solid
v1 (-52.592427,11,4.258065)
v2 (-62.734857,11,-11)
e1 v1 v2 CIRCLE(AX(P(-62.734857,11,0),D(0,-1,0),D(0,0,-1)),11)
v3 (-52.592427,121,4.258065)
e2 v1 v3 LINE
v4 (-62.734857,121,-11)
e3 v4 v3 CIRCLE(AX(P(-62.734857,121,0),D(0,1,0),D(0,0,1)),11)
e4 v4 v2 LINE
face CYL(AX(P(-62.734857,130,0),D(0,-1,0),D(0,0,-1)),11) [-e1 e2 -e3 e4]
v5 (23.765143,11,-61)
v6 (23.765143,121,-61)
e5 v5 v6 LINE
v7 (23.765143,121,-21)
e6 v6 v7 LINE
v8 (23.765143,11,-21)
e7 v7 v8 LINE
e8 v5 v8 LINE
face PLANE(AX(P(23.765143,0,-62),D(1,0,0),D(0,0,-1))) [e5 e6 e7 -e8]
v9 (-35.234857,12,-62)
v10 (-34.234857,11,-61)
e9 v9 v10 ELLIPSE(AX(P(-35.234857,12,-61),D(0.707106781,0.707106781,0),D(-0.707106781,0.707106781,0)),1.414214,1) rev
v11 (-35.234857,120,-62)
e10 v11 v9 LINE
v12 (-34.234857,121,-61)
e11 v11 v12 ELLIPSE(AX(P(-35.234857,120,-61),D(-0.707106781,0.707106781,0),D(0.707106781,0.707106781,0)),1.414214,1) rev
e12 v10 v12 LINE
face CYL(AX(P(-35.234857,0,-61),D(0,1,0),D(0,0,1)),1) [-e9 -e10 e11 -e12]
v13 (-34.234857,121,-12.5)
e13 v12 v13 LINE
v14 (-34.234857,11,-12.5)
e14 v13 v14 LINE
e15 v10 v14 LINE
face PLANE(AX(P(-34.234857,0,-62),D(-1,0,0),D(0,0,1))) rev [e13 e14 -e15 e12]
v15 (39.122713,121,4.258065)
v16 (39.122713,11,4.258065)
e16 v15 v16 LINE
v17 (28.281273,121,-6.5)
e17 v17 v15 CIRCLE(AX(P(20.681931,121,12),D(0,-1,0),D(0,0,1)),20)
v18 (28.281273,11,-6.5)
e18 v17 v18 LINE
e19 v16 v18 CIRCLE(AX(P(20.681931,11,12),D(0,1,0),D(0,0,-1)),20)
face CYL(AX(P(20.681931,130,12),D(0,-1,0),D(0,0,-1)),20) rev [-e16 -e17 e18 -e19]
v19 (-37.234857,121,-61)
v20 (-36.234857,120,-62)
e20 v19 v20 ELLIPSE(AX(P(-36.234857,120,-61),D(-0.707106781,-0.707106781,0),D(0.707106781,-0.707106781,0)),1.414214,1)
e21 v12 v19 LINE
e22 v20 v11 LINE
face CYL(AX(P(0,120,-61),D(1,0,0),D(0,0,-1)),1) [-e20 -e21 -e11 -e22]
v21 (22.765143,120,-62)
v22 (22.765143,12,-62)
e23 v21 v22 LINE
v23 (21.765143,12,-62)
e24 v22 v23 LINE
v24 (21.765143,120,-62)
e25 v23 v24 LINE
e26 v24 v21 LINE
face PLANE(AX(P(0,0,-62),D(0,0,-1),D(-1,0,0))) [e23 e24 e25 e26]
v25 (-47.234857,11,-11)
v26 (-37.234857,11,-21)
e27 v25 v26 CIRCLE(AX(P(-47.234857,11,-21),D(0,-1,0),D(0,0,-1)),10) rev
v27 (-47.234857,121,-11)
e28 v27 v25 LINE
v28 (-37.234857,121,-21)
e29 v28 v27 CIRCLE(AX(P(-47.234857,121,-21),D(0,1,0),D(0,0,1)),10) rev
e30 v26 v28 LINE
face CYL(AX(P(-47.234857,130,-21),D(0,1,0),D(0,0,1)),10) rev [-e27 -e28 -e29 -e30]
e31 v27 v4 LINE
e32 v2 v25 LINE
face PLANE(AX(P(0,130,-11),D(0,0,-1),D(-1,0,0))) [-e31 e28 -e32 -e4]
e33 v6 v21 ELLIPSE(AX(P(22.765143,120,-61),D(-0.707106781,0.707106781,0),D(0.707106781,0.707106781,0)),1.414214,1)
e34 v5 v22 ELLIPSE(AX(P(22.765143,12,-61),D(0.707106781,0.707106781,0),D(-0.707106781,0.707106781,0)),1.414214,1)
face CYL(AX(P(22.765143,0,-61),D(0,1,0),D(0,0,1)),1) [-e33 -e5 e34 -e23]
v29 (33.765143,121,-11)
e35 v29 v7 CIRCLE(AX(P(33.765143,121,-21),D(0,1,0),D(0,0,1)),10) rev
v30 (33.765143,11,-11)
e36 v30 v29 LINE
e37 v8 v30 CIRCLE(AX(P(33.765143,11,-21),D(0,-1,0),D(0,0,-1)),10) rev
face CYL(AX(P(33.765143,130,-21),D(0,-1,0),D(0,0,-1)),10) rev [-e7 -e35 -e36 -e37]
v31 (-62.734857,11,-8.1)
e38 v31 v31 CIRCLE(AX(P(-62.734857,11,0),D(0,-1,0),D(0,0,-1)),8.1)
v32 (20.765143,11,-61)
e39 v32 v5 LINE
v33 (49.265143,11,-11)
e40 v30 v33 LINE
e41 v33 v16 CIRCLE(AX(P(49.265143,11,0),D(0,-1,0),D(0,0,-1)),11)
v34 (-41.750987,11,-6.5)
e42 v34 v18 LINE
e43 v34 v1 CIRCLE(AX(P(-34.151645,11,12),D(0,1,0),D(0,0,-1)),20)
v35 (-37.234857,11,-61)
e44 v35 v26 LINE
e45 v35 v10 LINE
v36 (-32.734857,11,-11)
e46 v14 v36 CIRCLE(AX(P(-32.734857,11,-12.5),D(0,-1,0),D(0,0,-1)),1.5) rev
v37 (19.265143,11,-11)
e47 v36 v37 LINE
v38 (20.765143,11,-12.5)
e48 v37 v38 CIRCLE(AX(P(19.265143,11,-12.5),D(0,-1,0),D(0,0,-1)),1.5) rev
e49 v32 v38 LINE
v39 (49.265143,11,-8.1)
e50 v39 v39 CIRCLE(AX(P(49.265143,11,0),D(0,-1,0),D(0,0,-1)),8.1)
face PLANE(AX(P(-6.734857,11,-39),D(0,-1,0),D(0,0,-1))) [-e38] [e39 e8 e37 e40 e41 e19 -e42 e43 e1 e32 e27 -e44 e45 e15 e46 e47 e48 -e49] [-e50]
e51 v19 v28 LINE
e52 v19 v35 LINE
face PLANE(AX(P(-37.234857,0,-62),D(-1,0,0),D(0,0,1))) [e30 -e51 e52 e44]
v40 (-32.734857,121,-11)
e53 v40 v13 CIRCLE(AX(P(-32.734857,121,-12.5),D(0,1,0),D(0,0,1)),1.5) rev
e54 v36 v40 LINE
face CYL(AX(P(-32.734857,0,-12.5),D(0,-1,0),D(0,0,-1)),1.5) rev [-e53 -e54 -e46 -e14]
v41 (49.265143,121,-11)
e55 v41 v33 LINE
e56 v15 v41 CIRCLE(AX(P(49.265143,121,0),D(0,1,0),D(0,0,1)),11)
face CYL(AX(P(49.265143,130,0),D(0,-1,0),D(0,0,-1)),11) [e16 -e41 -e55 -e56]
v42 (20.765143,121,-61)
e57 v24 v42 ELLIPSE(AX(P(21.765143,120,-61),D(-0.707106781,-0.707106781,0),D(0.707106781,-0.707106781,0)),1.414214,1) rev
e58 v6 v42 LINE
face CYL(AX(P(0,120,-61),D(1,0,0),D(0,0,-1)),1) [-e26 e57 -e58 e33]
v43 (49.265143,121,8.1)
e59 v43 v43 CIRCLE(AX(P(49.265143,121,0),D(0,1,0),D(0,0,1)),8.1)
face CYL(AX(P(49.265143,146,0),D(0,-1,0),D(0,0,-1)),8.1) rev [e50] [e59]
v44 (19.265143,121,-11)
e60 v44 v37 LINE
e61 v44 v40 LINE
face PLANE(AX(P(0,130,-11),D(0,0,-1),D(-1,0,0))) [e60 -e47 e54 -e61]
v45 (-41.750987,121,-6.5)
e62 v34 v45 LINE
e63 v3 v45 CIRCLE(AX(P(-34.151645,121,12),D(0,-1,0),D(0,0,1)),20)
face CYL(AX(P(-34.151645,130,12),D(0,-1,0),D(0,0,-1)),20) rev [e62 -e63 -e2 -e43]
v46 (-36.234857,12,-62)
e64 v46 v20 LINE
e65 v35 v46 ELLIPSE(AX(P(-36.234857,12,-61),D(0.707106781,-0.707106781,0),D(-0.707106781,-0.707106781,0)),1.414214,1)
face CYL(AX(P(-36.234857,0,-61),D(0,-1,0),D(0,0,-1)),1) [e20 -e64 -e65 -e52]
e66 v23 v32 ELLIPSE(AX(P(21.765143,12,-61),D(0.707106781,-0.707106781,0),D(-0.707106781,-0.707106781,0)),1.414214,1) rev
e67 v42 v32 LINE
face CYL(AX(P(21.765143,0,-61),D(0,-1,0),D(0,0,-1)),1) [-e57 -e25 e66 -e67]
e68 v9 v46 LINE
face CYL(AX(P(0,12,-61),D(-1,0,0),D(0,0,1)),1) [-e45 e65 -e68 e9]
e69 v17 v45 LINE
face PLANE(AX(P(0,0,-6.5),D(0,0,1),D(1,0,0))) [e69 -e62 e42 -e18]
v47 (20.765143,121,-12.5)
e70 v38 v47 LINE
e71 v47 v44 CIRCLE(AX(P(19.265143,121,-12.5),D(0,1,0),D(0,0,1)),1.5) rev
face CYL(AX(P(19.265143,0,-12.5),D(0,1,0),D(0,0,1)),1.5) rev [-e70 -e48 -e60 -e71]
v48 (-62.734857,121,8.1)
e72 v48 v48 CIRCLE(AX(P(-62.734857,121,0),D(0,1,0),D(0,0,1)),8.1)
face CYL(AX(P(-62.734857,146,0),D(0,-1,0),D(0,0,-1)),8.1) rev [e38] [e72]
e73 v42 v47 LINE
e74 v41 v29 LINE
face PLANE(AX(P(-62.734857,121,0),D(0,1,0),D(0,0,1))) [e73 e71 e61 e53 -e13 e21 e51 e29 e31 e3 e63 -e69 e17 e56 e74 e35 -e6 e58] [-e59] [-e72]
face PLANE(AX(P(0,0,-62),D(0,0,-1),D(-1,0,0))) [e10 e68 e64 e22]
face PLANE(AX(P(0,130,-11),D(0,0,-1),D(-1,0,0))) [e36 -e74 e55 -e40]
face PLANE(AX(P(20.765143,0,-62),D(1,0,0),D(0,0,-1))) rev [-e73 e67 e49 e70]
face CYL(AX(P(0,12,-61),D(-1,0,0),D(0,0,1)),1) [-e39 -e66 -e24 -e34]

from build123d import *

# Parameters (mm, degrees)
SKETCH1_R              = 8
BOSS_EXTRUDE1_DEPTH    = 130
FILLET1_R              = 20
SKETCH2_W              = 2
SKETCH2_H              = 130
BOSS_EXTRUDE4_DEPTH    = 30
CUT_EXTRUDE1_DEPTH     = 9
FILLET2_R              = 1
FILLET3_R              = 2
CUT_EXTRUDE2_START     = -11
CUT_EXTRUDE2_OUTLINE_W = 137
CUT_EXTRUDE2_OUTLINE_H = 54
CUT_EXTRUDE2_DEPTH     = 11
CUT_EXTRUDE3_DEPTH     = 50
SKETCH6_W              = 87.560859394
SKETCH6_H              = 110.580871242
SKETCH6_RX             = 28
SKETCH6_RY             = 6.639736886
SKETCH6_RY_2           = 5.950557319
BOSS_EXTRUDE7_DEPTH    = 1.5
SKETCH7_W              = 87.560859394
SKETCH7_H              = 1.5
CUT_EXTRUDE4_DEPTH     = 0.290435621
SKETCH8_W              = 87.560859394
SKETCH8_H              = 1.5
CUT_EXTRUDE5_DEPTH     = 0.290435621
SKETCH9_R              = 113.429913181
CUT_EXTRUDE6_DEPTH     = 135
SKETCH10_W             = 60.632055489
SKETCH10_H             = 78.176650268
BOSS_EXTRUDE8_DEPTH    = 4.5
SKETCH11_R             = 8.1
CUT_EXTRUDE7_DEPTH     = 135
SKETCH12_W             = 3
SKETCH12_H             = 110
BOSS_EXTRUDE9_DEPTH    = 51
FILLET4_R              = 10
FILLET5_R              = 1.5
FILLET7_R              = 1


# Read off the part's stored shape, not the designer's step: Cut-Extrude2
with BuildPart() as part:
    # Sketch1 → Boss-Extrude1 (new body)
    with BuildSketch(Plane(origin=(0, 0, 0), x_dir=(1, 0, 0), z_dir=(0, 1, 0))):
        with BuildLine():
            ThreePointArc((-62.734857267, 11), (-66.796876469, -10.22252415), (-55.185022832, 8))
            Line((-55.185022832, 8), (41.715308298, 8))
            ThreePointArc((41.715308298, 8), (53.327161935, -10.22252415), (49.265142733, 11))
            Line((49.265142733, 11), (-62.734857267, 11))
        make_face()
        with Locations(Location((-62.734857267, 0, 0), (0, 0, 270))):
            Circle(SKETCH1_R, mode=Mode.SUBTRACT)
        with Locations(Location((49.265142733, 0, 0), (0, 0, 270))):
            Circle(SKETCH1_R, mode=Mode.SUBTRACT)
    extrude(amount=BOSS_EXTRUDE1_DEPTH)

    # Fillet1
    fillet1_edges = [part.edges().sort_by_distance(p)[0] for p in [
        (41.715308298, 65, -8),
        (-55.185022832, 65, -8),
    ]]
    fillet(fillet1_edges, radius=FILLET1_R)

    # Sketch2 → Boss-Extrude4 (add)
    with BuildSketch(Plane(origin=(0, 0, -11), x_dir=(-1, 0, 0), z_dir=(0, 0, -1))):
        with Locations((7.734857267, 65)):
            Rectangle(SKETCH2_W, SKETCH2_H)
        with Locations((5.734857267, 65)):
            Rectangle(SKETCH2_W, SKETCH2_H)
    extrude(amount=BOSS_EXTRUDE4_DEPTH)

    # Sketch3 → Cut-Extrude1 (cut)
    with BuildSketch(Plane(origin=(0, 130, 0), x_dir=(1, 0, 0), z_dir=(0, 1, 0))):
        with BuildLine():
            Line((-34.151645411, 8), (20.681930877, 8))
            ThreePointArc((20.681930877, 8), (31.753545265, 4.655910508), (39.12271272, -4.258064516))
            ThreePointArc((39.12271272, -4.258064516), (58.425893512, -6.089387914), (49.265142733, 11))
            Line((49.265142733, 11), (-4.734857267, 11))
            Line((-4.734857267, 11), (-4.734857267, 41))
            Line((-4.734857267, 41), (-8.734857267, 41))
            Line((-8.734857267, 41), (-8.734857267, 11))
            Line((-8.734857267, 11), (-62.734857267, 11))
            ThreePointArc((-62.734857267, 11), (-71.895608046, -6.089387914), (-52.592427254, -4.258064516))
            ThreePointArc((-52.592427254, -4.258064516), (-45.223259799, 4.655910508), (-34.151645411, 8))
        make_face()
    extrude(amount=-CUT_EXTRUDE1_DEPTH, mode=Mode.SUBTRACT)

    # Fillet2
    fillet2_edges = [part.edges().sort_by_distance(p)[0] for p in [
        (-8.734857267, 60.5, -11),
        (-4.734857267, 60.5, -11),
    ]]
    fillet(fillet2_edges, radius=FILLET2_R)

    # Fillet3
    fillet3_edges = [part.edges().sort_by_distance(p)[0] for p in [
        (-4.734857267, 60.5, -41),
        (-8.734857267, 60.5, -41),
    ]]
    fillet(fillet3_edges, radius=FILLET3_R - 0.0001)  # a hair under: the kernel refuses the full size

    # Cut-Extrude2 outline → Cut-Extrude2 (cut)
    with BuildSketch(Plane.XZ.offset(CUT_EXTRUDE2_START)):
        with Locations((-6.5, -15)):
            Rectangle(CUT_EXTRUDE2_OUTLINE_W, CUT_EXTRUDE2_OUTLINE_H)
    extrude(amount=CUT_EXTRUDE2_DEPTH, mode=Mode.SUBTRACT)

    # Sketch5 → Cut-Extrude3 (cut)
    with BuildSketch(Plane(origin=(0, 0, -11), x_dir=(-1, 0, 0), z_dir=(0, 0, -1))):
        with BuildLine():
            add(Edge.make_bspline(
                [(27.082988225, 66), (27.082988225, 94), (20.443251339, 94)],
                knots=[1.570796327, 1.570796327, 1.570796327, 3.141592654, 3.141592654, 3.141592654], degree=2, weights=[1, 0.707106781, 1]))
            Line((20.443251339, 94), (20.443251339, 66))
            Line((20.443251339, 66), (27.082988225, 66))
        make_face()
        with BuildLine():
            Line((20.443251339, 66), (20.443251339, 94))
            add(Edge.make_bspline(
                [(20.443251339, 94), (13.803514453, 94), (13.803514453, 66)],
                knots=[3.141592654, 3.141592654, 3.141592654, 4.71238898, 4.71238898, 4.71238898], degree=2, weights=[1, 0.707106781, 1]))
            Line((13.803514453, 66), (20.443251339, 66))
        make_face()
        with BuildLine():
            Line((20.443251339, 66), (13.803514453, 66))
            add(Edge.make_bspline(
                [(13.803514453, 66), (13.803514453, 38), (20.443251339, 38)],
                knots=[4.71238898, 4.71238898, 4.71238898, 6.283185307, 6.283185307, 6.283185307], degree=2, weights=[1, 0.707106781, 1]))
            add(Edge.make_bspline(
                [(20.443251339, 38), (27.082988225, 38), (27.082988225, 66)],
                knots=[0, 0, 0, 1.570796327, 1.570796327, 1.570796327], degree=2, weights=[1, 0.707106781, 1]))
            Line((27.082988225, 66), (20.443251339, 66))
        make_face()
        with BuildLine():
            Line((-1.022979486, 66), (-6.973536805, 66))
            Line((-6.973536805, 66), (-12.924094124, 66))
            add(Edge.make_bspline(
                [(-12.924094124, 66), (-12.924094124, 38), (-6.973536805, 38)],
                knots=[4.71238898, 4.71238898, 4.71238898, 6.283185307, 6.283185307, 6.283185307], degree=2, weights=[1, 0.707106781, 1]))
            add(Edge.make_bspline(
                [(-6.973536805, 38), (-1.022979486, 38), (-1.022979486, 66)],
                knots=[0, 0, 0, 1.570796327, 1.570796327, 1.570796327], degree=2, weights=[1, 0.707106781, 1]))
        make_face()
        with BuildLine():
            add(Edge.make_bspline(
                [(-1.022979486, 66), (-1.022979486, 94), (-6.973536805, 94)],
                knots=[1.570796327, 1.570796327, 1.570796327, 3.141592654, 3.141592654, 3.141592654], degree=2, weights=[1, 0.707106781, 1]))
            Line((-6.973536805, 94), (-6.973536805, 66))
            Line((-6.973536805, 66), (-1.022979486, 66))
        make_face()
        with BuildLine():
            Line((-6.973536805, 66), (-6.973536805, 94))
            add(Edge.make_bspline(
                [(-6.973536805, 94), (-12.924094124, 94), (-12.924094124, 66)],
                knots=[3.141592654, 3.141592654, 3.141592654, 4.71238898, 4.71238898, 4.71238898], degree=2, weights=[1, 0.707106781, 1]))
            Line((-12.924094124, 66), (-6.973536805, 66))
        make_face()
    extrude(amount=-CUT_EXTRUDE3_DEPTH, mode=Mode.SUBTRACT)

    # Sketch6 → Boss-Extrude7 (add)
    with BuildSketch(Plane.XY.offset(-8)):
        with Locations((-6.734857267, 66)):
            Rectangle(SKETCH6_W, SKETCH6_H)
        with Locations(Location((-20.443251339, 66), (0, 0, -90))):
            Ellipse(SKETCH6_RX, SKETCH6_RY, mode=Mode.SUBTRACT)
        with Locations(Location((6.973536805, 66), (0, 0, -90))):
            Ellipse(SKETCH6_RX, SKETCH6_RY_2, mode=Mode.SUBTRACT)
    extrude(amount=BOSS_EXTRUDE7_DEPTH)

    # Sketch7 → Cut-Extrude4 (cut)
    with BuildSketch(Plane(origin=(0, 121.290435621, 0), x_dir=(1, 0, 0), z_dir=(0, 1, 0))):
        with Locations((-6.734857267, 7.25)):
            Rectangle(SKETCH7_W, SKETCH7_H)
    extrude(amount=-CUT_EXTRUDE4_DEPTH, mode=Mode.SUBTRACT)

    # Sketch8 → Cut-Extrude5 (cut)
    with BuildSketch(Plane.XZ.offset(-10.709564379)):
        with Locations((-6.734857267, -7.25)):
            Rectangle(SKETCH8_W, SKETCH8_H)
    extrude(amount=-CUT_EXTRUDE5_DEPTH, mode=Mode.SUBTRACT)

    # Sketch9 → Cut-Extrude6 (cut)
    with BuildSketch(Plane(origin=(0, 0, -11), x_dir=(-1, 0, 0), z_dir=(0, 0, -1))):
        with Locations((15.997363152, 101.645153737)):
            Circle(SKETCH9_R)
    extrude(amount=CUT_EXTRUDE6_DEPTH, mode=Mode.SUBTRACT)

    # Sketch10 → Boss-Extrude8 (add)
    with BuildSketch(Plane(origin=(0, 0, -11), x_dir=(-1, 0, 0), z_dir=(0, 0, -1))):
        with Locations((5.573817907, 65.992517727)):
            Rectangle(SKETCH10_W, SKETCH10_H)
    extrude(amount=-BOSS_EXTRUDE8_DEPTH)

    # Sketch11 → Cut-Extrude7 (cut)
    with BuildSketch(Plane.XZ.offset(-11)):
        with Locations(Location((-62.734857267, 0, 0), (0, 0, 270))):
            Circle(SKETCH11_R)
        with Locations(Location((49.265142733, 0, 0), (0, 0, 270))):
            Circle(SKETCH11_R)
    extrude(amount=-CUT_EXTRUDE7_DEPTH, mode=Mode.SUBTRACT)

    # Sketch12 → Boss-Extrude9 (add)
    with BuildSketch(Plane(origin=(0, 0, -11), x_dir=(-1, 0, 0), z_dir=(0, 0, -1))):
        with Locations((-22.265142733, 66)):
            Rectangle(SKETCH12_W, SKETCH12_H)
        with Locations((35.734857267, 66)):
            Rectangle(SKETCH12_W, SKETCH12_H)
    extrude(amount=BOSS_EXTRUDE9_DEPTH)

    # Fillet4
    fillet4_edges = [part.edges().sort_by_distance(p)[0] for p in [
        (23.765142733, 66, -11),
        (-37.234857267, 66, -11),
    ]]
    fillet(fillet4_edges, radius=FILLET4_R)

    # Fillet5
    fillet5_edges = [part.edges().sort_by_distance(p)[0] for p in [
        (20.765142733, 66, -11),
        (-34.234857267, 66, -11),
    ]]
    fillet(fillet5_edges, radius=FILLET5_R)

    # Fillet7
    fillet7_edges = [part.edges().sort_by_distance(p)[0] for p in [
        (23.765142733, 66, -62),
        (22.265142733, 11, -62),
        (20.765142733, 66, -62),
        (22.265142733, 121, -62),
        (-37.234857267, 66, -62),
        (-35.734857267, 121, -62),
        (-34.234857267, 66, -62),
        (-35.734857267, 11, -62),
    ]]
    fillet(fillet7_edges, radius=FILLET7_R)


solid = part.part
